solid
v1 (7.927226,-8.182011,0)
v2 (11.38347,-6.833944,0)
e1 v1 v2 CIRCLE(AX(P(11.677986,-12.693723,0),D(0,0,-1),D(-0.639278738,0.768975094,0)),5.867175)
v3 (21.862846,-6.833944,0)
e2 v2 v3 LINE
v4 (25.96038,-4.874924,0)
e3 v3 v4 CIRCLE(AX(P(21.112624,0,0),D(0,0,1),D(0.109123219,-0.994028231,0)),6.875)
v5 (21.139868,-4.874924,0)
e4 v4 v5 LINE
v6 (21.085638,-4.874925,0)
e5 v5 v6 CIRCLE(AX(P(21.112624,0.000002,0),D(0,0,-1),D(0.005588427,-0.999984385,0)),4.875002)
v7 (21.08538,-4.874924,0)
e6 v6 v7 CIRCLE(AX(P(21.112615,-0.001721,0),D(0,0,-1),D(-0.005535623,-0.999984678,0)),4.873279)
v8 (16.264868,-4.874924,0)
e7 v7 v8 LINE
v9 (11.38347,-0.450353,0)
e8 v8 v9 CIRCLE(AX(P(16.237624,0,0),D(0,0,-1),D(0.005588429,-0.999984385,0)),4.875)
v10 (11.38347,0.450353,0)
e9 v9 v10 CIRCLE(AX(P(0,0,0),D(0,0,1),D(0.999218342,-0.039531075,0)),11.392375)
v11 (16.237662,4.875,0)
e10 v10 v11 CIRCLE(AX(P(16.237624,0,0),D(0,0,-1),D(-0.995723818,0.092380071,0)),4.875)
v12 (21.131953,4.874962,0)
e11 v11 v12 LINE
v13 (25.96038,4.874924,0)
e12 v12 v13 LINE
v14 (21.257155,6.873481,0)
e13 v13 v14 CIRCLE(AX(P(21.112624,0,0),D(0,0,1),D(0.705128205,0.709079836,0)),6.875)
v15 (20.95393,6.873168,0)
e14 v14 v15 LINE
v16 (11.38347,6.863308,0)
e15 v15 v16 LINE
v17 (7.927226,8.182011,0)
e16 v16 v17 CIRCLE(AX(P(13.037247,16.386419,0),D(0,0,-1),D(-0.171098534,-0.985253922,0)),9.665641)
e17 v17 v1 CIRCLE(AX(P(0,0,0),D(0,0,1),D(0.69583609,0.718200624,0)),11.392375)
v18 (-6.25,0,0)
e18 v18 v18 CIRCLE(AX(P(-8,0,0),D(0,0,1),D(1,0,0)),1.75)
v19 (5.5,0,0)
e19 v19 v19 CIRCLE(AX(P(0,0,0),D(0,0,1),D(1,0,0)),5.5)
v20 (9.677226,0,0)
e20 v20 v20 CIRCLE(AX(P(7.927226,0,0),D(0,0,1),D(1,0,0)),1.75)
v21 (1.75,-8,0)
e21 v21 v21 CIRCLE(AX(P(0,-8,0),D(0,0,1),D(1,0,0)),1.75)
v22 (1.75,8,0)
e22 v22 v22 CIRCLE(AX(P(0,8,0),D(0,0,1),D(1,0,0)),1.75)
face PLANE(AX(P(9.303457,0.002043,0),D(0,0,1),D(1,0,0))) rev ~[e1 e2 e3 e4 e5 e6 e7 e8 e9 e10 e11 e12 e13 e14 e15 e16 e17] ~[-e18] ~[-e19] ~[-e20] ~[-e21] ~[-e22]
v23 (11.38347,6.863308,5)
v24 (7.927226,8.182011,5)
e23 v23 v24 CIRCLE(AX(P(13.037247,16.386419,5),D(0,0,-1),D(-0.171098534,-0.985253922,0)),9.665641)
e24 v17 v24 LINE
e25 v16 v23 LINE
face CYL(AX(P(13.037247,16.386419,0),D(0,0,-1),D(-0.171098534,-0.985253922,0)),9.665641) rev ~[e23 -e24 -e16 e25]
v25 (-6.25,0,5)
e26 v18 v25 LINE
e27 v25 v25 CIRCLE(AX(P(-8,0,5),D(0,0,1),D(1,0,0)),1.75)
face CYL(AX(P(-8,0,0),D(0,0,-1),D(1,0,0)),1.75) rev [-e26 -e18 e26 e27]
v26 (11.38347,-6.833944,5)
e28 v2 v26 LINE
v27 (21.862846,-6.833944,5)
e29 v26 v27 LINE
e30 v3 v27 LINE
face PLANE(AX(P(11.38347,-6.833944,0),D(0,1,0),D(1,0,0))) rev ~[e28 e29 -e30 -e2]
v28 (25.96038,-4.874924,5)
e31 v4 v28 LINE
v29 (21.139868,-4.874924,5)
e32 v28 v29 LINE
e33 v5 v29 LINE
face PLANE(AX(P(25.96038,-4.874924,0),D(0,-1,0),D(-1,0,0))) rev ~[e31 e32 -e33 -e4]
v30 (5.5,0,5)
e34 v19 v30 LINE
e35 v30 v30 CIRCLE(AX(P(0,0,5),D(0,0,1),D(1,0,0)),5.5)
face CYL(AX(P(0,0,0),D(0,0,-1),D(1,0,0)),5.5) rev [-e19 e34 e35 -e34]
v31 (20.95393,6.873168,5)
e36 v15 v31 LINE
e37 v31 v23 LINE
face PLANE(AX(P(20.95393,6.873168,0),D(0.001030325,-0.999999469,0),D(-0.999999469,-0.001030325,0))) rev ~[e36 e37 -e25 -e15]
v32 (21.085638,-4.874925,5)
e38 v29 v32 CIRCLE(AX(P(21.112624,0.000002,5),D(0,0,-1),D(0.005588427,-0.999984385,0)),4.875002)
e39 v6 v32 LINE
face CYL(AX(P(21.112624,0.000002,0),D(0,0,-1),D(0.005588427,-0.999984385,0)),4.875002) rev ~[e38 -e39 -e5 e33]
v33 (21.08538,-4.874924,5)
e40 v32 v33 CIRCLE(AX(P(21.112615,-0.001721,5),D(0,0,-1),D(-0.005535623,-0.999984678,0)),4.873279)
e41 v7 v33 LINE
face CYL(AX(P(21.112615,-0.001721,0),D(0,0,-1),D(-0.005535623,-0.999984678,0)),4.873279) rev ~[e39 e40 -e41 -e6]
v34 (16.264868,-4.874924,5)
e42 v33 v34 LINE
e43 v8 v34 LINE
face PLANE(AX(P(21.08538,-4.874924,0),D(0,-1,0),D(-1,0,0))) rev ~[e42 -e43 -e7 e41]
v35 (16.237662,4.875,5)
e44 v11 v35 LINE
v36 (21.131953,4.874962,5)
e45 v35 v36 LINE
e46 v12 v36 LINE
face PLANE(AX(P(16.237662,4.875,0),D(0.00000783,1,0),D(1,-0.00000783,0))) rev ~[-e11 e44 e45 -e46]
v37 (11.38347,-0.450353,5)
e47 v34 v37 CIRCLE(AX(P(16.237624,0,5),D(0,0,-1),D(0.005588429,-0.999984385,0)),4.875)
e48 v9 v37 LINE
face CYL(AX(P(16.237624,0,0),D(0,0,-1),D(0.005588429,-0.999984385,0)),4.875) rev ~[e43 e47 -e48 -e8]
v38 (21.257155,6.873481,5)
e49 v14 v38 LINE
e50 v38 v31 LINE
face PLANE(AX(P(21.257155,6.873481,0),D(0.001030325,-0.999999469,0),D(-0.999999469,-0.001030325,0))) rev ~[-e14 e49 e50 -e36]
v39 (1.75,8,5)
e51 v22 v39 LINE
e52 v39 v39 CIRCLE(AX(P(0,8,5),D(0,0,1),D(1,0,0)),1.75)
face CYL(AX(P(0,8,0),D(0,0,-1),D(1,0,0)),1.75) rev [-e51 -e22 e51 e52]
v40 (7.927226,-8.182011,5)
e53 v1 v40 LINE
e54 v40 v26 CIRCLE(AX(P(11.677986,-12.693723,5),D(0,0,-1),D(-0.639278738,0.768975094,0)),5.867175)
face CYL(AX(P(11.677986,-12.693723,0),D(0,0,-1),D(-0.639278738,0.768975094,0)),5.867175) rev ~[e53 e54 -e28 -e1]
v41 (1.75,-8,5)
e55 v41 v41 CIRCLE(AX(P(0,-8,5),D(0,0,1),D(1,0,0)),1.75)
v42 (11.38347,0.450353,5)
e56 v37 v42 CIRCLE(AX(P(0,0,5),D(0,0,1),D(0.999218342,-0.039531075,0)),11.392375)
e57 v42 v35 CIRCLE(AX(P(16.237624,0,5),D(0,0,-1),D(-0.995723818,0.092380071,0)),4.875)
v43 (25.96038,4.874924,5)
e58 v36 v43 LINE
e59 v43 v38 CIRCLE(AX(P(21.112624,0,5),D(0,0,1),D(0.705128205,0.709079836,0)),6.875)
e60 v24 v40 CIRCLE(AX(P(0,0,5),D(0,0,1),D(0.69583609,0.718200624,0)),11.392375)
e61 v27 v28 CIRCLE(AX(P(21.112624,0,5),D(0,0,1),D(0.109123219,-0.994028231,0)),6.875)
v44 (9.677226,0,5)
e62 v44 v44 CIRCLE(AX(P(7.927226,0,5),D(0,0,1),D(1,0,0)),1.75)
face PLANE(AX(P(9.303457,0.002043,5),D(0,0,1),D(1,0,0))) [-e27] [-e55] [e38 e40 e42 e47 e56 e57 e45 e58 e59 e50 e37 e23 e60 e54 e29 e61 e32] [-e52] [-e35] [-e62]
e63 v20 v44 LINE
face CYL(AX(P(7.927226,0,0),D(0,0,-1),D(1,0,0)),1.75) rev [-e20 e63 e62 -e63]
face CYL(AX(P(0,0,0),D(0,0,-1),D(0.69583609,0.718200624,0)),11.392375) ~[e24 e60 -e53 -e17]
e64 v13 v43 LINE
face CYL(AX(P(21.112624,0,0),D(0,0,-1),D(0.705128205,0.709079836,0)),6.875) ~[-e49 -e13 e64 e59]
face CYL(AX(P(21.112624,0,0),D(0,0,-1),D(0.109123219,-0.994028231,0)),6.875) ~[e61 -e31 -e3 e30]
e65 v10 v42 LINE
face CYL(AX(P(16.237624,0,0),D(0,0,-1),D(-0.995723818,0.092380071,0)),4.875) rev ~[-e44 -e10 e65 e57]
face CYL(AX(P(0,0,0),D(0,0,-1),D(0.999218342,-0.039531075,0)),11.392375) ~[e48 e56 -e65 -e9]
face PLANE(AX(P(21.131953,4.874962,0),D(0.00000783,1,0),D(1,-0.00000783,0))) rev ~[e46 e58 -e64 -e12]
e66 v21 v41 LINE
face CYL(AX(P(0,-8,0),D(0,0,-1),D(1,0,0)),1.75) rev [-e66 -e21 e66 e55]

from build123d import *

# Parameters (mm, degrees)
F0_R     = 1.75
F0_R_2   = 5.5
F1_DEPTH = 5


# Not quite as in the source:
# - ends of sketch curves that miss each other by under 0.0002 mm in the source are joined


with BuildPart() as f1:
    # F0 (on Top) → F1 (new body)
    with BuildSketch(Plane.XY):
        with BuildLine():
            ThreePointArc((11.3834703749, 6.8633075193), (9.5916723545, 7.355768815), (7.9272258947, 8.1820110654))
            ThreePointArc((7.9272258947, 8.1820110654), (-11.3923753212, 0), (7.9272258947, -8.1820110654))
            ThreePointArc((7.9272258947, -8.1820110654), (9.5459951376, -7.2276126539), (11.3834703749, -6.8339440851))
            Line((11.3834703749, -6.8339440851), (21.8628461179, -6.8339440851))
            ThreePointArc((21.8628461179, -6.8339440851), (24.0780549828, -6.2025675349), (25.9603803998, -4.874923875))
            Line((25.9603803998, -4.874923875), (21.1398675793, -4.874923875))
            ThreePointArc((21.1398675793, -4.874923875), (21.1127528894, -4.8749999983), (21.0856381954, -4.8749253089))
            ThreePointArc((21.0856381954, -4.8749253089), (21.0855085866, -4.8749245897), (21.0853803998, -4.874923875))
            Line((21.0853803998, -4.874923875), (16.2648675793, -4.874923875))
            ThreePointArc((16.2648675793, -4.874923875), (12.9636398268, -3.6120150473), (11.3834703749, -0.4503528446))
            ThreePointArc((11.3834703749, -0.4503528446), (11.3923753212, 0), (11.3834703749, 0.4503528446))
            ThreePointArc((11.3834703749, 0.4503528446), (12.9535739288, 3.6028655537), (16.2376621588, 4.8749999999))
            Line((16.2376621588, 4.8749999999), (21.1319533126, 4.8749616796))
            Line((21.1319533126, 4.8749616796), (25.9603803998, 4.874923875))
            ThreePointArc((25.9603803998, 4.874923875), (23.8013578283, 6.3274272295), (21.2571545841, 6.8734806254))
            Line((21.2571545841, 6.8734806254), (20.9539298759, 6.8731682053))
            Line((20.9539298759, 6.8731682053), (11.3834703749, 6.8633075193))
        make_face()
        with Locations((0, -8)):
            Circle(F0_R, mode=Mode.SUBTRACT)
        with Locations((-8, 0)):
            Circle(F0_R, mode=Mode.SUBTRACT)
        Circle(F0_R_2, mode=Mode.SUBTRACT)
        with Locations((7.9272258947, 0)):
            Circle(F0_R, mode=Mode.SUBTRACT)
        with Locations((0, 8)):
            Circle(F0_R, mode=Mode.SUBTRACT)
    extrude(amount=F1_DEPTH)


solid = f1.part
